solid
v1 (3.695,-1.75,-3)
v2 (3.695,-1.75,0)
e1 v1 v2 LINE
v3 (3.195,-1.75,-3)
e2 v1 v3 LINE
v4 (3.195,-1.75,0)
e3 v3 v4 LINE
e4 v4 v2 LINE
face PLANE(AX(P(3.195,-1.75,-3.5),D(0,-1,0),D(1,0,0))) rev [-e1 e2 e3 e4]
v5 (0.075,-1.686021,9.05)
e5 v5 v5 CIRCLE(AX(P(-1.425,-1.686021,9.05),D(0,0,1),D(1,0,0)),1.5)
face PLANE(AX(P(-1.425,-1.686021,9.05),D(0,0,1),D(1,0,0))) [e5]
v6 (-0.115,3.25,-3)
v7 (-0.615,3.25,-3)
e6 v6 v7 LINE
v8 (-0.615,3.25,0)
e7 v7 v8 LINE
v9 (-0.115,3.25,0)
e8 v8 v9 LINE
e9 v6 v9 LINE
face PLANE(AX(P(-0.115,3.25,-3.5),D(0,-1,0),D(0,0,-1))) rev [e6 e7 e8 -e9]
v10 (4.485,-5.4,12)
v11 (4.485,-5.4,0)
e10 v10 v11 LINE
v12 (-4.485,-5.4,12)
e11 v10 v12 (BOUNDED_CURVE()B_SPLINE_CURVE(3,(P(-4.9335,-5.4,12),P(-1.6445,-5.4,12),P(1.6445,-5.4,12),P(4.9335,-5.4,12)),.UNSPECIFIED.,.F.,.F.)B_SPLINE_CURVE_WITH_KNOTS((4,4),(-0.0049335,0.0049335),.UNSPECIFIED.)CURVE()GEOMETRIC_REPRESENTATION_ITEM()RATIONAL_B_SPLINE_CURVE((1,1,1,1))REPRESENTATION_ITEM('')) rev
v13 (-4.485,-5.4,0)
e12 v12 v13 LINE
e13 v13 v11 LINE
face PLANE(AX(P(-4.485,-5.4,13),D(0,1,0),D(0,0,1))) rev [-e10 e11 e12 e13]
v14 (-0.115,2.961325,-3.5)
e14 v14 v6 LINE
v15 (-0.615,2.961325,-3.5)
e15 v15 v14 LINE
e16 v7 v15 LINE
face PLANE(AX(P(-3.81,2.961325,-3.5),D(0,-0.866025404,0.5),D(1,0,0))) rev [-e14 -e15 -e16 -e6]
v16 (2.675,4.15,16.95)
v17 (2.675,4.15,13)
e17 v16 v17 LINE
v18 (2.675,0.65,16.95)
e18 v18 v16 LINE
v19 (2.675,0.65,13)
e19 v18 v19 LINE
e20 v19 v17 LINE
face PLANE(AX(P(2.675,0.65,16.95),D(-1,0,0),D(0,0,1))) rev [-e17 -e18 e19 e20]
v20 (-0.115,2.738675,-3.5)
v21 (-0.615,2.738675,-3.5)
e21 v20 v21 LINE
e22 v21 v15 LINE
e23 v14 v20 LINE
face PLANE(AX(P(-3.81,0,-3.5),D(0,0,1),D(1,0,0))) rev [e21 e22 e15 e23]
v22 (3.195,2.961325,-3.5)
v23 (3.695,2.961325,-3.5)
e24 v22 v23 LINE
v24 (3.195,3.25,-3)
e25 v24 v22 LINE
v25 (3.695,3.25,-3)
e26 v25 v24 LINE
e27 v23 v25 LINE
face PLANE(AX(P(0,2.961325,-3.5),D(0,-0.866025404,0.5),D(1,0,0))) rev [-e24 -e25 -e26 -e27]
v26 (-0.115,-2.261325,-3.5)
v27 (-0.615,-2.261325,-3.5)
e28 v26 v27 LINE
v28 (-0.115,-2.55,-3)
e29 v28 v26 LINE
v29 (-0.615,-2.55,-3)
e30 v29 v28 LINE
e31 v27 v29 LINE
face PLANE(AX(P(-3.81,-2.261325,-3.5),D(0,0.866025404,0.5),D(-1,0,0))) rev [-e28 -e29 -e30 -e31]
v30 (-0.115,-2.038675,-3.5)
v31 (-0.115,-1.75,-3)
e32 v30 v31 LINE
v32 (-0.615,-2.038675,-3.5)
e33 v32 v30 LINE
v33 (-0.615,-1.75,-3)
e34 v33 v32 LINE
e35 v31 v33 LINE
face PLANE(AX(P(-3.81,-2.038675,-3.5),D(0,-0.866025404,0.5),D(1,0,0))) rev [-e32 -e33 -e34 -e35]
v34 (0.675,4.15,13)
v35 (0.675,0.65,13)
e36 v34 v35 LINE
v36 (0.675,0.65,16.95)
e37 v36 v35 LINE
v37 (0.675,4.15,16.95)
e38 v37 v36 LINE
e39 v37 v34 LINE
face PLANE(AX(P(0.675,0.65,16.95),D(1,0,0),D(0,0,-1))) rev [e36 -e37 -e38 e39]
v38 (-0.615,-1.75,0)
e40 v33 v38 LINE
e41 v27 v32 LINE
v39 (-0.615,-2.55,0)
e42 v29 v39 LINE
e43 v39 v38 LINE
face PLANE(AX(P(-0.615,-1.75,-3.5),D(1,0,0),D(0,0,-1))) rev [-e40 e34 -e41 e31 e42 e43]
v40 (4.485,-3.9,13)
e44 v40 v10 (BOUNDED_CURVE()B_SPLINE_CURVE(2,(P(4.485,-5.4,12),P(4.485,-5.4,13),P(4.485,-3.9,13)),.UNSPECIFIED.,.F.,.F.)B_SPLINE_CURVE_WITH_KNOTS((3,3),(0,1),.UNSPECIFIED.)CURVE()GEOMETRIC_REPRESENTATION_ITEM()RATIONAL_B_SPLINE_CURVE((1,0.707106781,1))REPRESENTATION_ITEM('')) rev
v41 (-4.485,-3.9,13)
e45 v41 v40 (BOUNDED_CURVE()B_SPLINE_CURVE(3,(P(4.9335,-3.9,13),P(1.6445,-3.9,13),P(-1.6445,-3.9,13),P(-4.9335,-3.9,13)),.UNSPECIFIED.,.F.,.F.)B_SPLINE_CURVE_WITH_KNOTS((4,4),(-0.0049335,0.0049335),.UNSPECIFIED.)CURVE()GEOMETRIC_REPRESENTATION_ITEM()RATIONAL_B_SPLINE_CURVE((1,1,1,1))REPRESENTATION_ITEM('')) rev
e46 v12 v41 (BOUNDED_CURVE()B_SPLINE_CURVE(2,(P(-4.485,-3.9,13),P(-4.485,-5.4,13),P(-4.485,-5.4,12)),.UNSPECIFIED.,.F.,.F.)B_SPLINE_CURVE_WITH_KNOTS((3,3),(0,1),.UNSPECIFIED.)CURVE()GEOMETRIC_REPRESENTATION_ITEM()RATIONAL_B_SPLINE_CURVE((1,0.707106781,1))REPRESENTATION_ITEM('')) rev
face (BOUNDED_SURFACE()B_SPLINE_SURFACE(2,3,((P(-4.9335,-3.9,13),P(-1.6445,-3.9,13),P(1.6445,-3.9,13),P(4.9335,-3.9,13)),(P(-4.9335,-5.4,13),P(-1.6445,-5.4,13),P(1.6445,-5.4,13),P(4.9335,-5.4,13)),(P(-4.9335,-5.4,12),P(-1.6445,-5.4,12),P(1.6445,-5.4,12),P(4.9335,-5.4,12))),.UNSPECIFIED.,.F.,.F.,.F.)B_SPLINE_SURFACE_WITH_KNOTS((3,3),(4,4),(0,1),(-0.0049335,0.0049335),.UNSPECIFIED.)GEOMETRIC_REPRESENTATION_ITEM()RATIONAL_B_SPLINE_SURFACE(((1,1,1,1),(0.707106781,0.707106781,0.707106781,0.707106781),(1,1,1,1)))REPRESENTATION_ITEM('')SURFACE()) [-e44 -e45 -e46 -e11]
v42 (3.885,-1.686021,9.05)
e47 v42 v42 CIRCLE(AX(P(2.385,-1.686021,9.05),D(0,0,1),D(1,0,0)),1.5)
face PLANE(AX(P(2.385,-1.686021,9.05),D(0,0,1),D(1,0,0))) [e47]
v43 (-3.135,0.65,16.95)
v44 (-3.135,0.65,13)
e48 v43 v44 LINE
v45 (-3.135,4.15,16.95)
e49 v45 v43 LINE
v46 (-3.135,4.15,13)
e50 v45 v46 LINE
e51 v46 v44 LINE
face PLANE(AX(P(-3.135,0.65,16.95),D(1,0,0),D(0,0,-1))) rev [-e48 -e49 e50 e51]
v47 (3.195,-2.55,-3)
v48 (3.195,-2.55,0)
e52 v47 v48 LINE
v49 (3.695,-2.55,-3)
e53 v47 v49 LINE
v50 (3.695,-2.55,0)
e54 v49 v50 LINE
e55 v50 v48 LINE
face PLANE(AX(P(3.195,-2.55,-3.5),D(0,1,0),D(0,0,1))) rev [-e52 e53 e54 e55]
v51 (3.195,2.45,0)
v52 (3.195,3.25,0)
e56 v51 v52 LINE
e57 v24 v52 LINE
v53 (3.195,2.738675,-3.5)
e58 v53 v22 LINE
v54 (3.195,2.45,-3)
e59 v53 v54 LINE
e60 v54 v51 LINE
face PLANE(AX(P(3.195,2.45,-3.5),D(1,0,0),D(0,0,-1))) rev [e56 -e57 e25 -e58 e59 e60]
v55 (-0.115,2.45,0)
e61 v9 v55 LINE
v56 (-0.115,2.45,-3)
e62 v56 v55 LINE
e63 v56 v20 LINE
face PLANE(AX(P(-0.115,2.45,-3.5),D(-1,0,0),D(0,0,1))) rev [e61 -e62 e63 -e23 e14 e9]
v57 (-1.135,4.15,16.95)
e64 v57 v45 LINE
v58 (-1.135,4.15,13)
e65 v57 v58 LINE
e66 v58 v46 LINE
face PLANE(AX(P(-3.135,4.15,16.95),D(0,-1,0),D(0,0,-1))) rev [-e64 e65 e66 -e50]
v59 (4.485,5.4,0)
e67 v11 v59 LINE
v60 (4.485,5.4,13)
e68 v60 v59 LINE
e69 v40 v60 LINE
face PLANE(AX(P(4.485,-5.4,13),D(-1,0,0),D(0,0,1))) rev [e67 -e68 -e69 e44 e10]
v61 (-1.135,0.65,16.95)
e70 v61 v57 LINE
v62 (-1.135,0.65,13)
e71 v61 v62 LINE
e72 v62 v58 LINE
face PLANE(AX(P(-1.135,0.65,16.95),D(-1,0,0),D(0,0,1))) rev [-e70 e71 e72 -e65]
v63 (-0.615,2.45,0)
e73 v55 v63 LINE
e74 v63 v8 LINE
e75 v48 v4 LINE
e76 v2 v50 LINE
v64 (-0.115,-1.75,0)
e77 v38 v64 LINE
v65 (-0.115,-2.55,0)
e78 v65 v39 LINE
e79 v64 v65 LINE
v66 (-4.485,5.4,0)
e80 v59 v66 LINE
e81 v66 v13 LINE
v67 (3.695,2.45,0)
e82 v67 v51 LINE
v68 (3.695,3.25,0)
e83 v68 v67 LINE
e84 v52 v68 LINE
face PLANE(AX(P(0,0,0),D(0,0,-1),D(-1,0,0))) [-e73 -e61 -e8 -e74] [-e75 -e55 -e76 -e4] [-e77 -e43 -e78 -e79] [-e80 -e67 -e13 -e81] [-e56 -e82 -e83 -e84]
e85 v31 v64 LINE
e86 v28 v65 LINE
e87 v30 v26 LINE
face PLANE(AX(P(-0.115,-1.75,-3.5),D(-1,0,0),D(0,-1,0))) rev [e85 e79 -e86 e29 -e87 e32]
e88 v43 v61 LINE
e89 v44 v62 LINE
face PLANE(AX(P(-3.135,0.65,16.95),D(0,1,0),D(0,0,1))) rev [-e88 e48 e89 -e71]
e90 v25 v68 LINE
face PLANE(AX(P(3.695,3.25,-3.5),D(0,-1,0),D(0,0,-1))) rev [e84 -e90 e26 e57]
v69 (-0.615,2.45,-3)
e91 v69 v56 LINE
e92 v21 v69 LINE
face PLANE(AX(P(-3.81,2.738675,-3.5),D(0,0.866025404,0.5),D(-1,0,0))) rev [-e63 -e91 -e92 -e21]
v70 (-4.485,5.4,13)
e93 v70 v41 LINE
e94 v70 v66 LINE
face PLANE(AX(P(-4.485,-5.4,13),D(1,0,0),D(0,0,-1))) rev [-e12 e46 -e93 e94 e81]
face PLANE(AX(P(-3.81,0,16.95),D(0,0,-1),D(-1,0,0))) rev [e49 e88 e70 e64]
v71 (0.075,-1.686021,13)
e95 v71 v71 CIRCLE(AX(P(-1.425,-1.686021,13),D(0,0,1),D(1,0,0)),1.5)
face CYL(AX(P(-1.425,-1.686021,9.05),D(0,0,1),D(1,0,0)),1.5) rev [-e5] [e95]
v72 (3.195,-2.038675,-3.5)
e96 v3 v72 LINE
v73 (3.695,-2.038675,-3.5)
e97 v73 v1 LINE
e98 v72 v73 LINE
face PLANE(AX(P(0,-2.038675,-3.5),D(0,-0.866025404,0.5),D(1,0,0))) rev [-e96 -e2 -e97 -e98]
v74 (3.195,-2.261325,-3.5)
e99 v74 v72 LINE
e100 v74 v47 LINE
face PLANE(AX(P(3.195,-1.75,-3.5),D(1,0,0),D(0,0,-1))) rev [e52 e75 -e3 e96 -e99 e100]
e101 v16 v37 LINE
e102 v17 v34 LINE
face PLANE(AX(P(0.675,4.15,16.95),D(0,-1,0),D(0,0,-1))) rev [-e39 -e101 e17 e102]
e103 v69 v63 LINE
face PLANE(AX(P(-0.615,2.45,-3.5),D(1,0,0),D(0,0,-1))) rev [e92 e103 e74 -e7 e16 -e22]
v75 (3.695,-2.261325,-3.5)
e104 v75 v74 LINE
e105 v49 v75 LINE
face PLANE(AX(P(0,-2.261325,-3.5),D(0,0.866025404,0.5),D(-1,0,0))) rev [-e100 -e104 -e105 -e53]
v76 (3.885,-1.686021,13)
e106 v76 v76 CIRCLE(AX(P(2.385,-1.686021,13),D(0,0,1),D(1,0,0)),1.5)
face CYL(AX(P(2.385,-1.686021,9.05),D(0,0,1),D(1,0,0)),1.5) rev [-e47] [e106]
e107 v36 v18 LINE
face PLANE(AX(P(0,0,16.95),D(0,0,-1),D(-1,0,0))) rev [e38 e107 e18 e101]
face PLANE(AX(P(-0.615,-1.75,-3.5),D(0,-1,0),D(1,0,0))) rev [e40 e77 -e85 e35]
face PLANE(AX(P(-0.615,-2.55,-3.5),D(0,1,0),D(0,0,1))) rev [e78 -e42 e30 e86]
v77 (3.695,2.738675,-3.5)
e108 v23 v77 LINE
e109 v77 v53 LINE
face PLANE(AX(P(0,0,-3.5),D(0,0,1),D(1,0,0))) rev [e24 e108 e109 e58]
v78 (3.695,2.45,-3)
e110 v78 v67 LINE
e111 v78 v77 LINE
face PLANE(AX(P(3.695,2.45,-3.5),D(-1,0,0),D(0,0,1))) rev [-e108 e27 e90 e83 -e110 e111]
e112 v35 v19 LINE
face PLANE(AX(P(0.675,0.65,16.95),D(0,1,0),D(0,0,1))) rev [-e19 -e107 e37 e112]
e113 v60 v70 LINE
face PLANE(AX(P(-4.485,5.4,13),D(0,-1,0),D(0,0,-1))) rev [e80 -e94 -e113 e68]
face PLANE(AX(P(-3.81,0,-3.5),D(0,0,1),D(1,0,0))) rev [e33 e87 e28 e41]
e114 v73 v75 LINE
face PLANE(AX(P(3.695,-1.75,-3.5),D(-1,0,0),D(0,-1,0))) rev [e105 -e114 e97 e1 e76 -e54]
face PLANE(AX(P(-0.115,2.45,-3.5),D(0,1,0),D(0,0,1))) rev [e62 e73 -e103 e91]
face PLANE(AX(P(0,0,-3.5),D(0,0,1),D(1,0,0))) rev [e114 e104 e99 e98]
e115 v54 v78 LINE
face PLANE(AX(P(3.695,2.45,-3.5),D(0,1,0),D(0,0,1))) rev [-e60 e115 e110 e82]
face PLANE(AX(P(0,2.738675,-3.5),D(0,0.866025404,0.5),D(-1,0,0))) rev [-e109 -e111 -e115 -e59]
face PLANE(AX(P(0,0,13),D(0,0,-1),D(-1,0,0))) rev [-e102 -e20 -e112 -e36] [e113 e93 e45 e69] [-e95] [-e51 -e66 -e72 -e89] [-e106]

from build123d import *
from OCP.BRepFilletAPI import BRepFilletAPI_MakeChamfer

# Parameters (mm, degrees)
SKETCH_1_W                          = 8.97
SKETCH_1_H                          = 10.8
EXTRUDE_1_DEPTH                     = 13
FILLET_1_SIZE                       = 1
FILLET_1_SIZE_2                     = 1.5
SKETCH_2_W                          = 2
SKETCH_2_H                          = 3.5
EXTRUDE_2_DEPTH                     = 3.95
SKETCH_3_R                          = 1.5
CUT_EXTRUDE_1_DEPTH                 = 3.95
SKETCH_4_W                          = 0.5
SKETCH_4_H                          = 0.8
EXTRUDE_3_DEPTH                     = 3.5
CHAMFER_1_SIZE                      = 0.5
CHAMFER_1_SIZE2                     = 0.288675135
PATTERN_LINEAR_2_COUNT              = 2
PATTERN_LINEAR_2_PITCH              = 3.81
CHAMFER_1_OF_PATTERN_LINEAR_2_SIZE  = 0.5
CHAMFER_1_OF_PATTERN_LINEAR_2_SIZE2 = 0.288675135


with BuildPart() as part:
    # Эскиз1 → Бобышка-Вытянуть1 (new body)
    with BuildSketch(Plane.XY):
        Rectangle(SKETCH_1_W, SKETCH_1_H)
    extrude(amount=EXTRUDE_1_DEPTH)

    # Скругление1
    # an asymmetric fillet: 1.5, 1 mm, written as the material it takes off along each edge
    with BuildSketch(Plane(origin=(-8.235, -5.4, 13), x_dir=(0, 0, -1), z_dir=(1, 0, 0))) as fillet_1_piece_1:
        with BuildLine():
            Bezier((FILLET_1_SIZE, 0), (0, 0), (0, FILLET_1_SIZE_2), weights=[1, 0.707106781, 1])
            Line((0, FILLET_1_SIZE_2), (0, 0))
            Line((0, 0), (FILLET_1_SIZE, 0))
        make_face()
    extrude(amount=16.47, mode=Mode.SUBTRACT)

    # Эскиз2 → Бобышка-Вытянуть2 (add)
    with BuildSketch(Plane.XY.offset(13)):
        with Locations((1.675, 2.4)):
            Rectangle(SKETCH_2_W, SKETCH_2_H)
    extrude_2 = extrude(amount=EXTRUDE_2_DEPTH)

    # Эскиз3 → Вырез-Вытянуть1 (cut)
    with BuildSketch(Plane.XY.offset(13)):
        with Locations((2.385, -1.686021073)):
            Circle(SKETCH_3_R)
    cut_extrude_1 = extrude(amount=-CUT_EXTRUDE_1_DEPTH, mode=Mode.SUBTRACT)

    # Эскиз4 → Бобышка-Вытянуть3 (add)
    with BuildSketch(Plane(origin=(0, 0, 0), x_dir=(-1, 0, 0), z_dir=(0, 0, -1))):
        with Locations((-3.445, 2.85)):
            Rectangle(SKETCH_4_W, SKETCH_4_H)
        with Locations((-3.445, -2.15)):
            Rectangle(SKETCH_4_W, SKETCH_4_H)
    extrude_3 = extrude(amount=EXTRUDE_3_DEPTH)

    # Фаска1: one chamfer whose edges measure the first distance from different faces: ONE call of the kernel's chamfer builder (chamfer() names one face for all edges)
    chamfer_1_edges_1 = [part.edges().sort_by_distance(p)[0] for p in [
        (3.445, 3.25, -3.5),
    ]]
    chamfer_1_side_1 = [part.faces().sort_by_distance(p)[0] for p in [
        (3.445, 3.25, -1.75),
    ]]
    chamfer_1_edges_2 = [part.edges().sort_by_distance(p)[0] for p in [
        (3.445, 2.45, -3.5),
    ]]
    chamfer_1_side_2 = [part.faces().sort_by_distance(p)[0] for p in [
        (3.445, 2.45, -1.75),
    ]]
    chamfer_1_edges_3 = [part.edges().sort_by_distance(p)[0] for p in [
        (3.445, -2.55, -3.5),
    ]]
    chamfer_1_side_3 = [part.faces().sort_by_distance(p)[0] for p in [
        (3.445, -2.55, -1.75),
    ]]
    chamfer_1_edges_4 = [part.edges().sort_by_distance(p)[0] for p in [
        (3.445, -1.75, -3.5),
    ]]
    chamfer_1_side_4 = [part.faces().sort_by_distance(p)[0] for p in [
        (3.445, -1.75, -1.75),
    ]]
    chamfer_1 = BRepFilletAPI_MakeChamfer(part.part.solid().wrapped)
    for e in chamfer_1_edges_1:
        chamfer_1.Add(CHAMFER_1_SIZE, CHAMFER_1_SIZE2, e.wrapped, chamfer_1_side_1[0].wrapped)  # the first distance lies on this face
    for e in chamfer_1_edges_2:
        chamfer_1.Add(CHAMFER_1_SIZE, CHAMFER_1_SIZE2, e.wrapped, chamfer_1_side_2[0].wrapped)  # the first distance lies on this face
    for e in chamfer_1_edges_3:
        chamfer_1.Add(CHAMFER_1_SIZE, CHAMFER_1_SIZE2, e.wrapped, chamfer_1_side_3[0].wrapped)  # the first distance lies on this face
    for e in chamfer_1_edges_4:
        chamfer_1.Add(CHAMFER_1_SIZE, CHAMFER_1_SIZE2, e.wrapped, chamfer_1_side_4[0].wrapped)  # the first distance lies on this face
    add(Compound.cast(chamfer_1.Shape()), mode=Mode.REPLACE)

    # Линейный массив2: Бобышка-Вытянуть2, Вырез-Вытянуть1, Бобышка-Вытянуть3 ×2
    with Locations(*[(-i * PATTERN_LINEAR_2_PITCH, 0, 0) for i in range(1, PATTERN_LINEAR_2_COUNT)]):
        add(extrude_2)
        add(cut_extrude_1, mode=Mode.SUBTRACT)
        add(extrude_3)

    # Фаска1 of Линейный массив2: one chamfer whose edges measure the first distance from different faces: ONE call of the kernel's chamfer builder (chamfer() names one face for all edges)
    chamfer_1_of_pattern_linear_2_edges_1 = [part.edges().sort_by_distance(p)[0] for p in [
        (-0.365, 3.25, -3.5),
    ]]
    chamfer_1_of_pattern_linear_2_side_1 = [part.faces().sort_by_distance(p)[0] for p in [
        (-0.365, 3.25, -1.75),
    ]]
    chamfer_1_of_pattern_linear_2_edges_2 = [part.edges().sort_by_distance(p)[0] for p in [
        (-0.365, 2.45, -3.5),
    ]]
    chamfer_1_of_pattern_linear_2_side_2 = [part.faces().sort_by_distance(p)[0] for p in [
        (-0.365, 2.45, -1.75),
    ]]
    chamfer_1_of_pattern_linear_2_edges_3 = [part.edges().sort_by_distance(p)[0] for p in [
        (-0.365, -2.55, -3.5),
    ]]
    chamfer_1_of_pattern_linear_2_side_3 = [part.faces().sort_by_distance(p)[0] for p in [
        (-0.365, -2.55, -1.75),
    ]]
    chamfer_1_of_pattern_linear_2_edges_4 = [part.edges().sort_by_distance(p)[0] for p in [
        (-0.365, -1.75, -3.5),
    ]]
    chamfer_1_of_pattern_linear_2_side_4 = [part.faces().sort_by_distance(p)[0] for p in [
        (-0.365, -1.75, -1.75),
    ]]
    chamfer_1_of_pattern_linear_2 = BRepFilletAPI_MakeChamfer(part.part.solid().wrapped)
    for e in chamfer_1_of_pattern_linear_2_edges_1:
        chamfer_1_of_pattern_linear_2.Add(CHAMFER_1_OF_PATTERN_LINEAR_2_SIZE, CHAMFER_1_OF_PATTERN_LINEAR_2_SIZE2, e.wrapped, chamfer_1_of_pattern_linear_2_side_1[0].wrapped)  # the first distance lies on this face
    for e in chamfer_1_of_pattern_linear_2_edges_2:
        chamfer_1_of_pattern_linear_2.Add(CHAMFER_1_OF_PATTERN_LINEAR_2_SIZE, CHAMFER_1_OF_PATTERN_LINEAR_2_SIZE2, e.wrapped, chamfer_1_of_pattern_linear_2_side_2[0].wrapped)  # the first distance lies on this face
    for e in chamfer_1_of_pattern_linear_2_edges_3:
        chamfer_1_of_pattern_linear_2.Add(CHAMFER_1_OF_PATTERN_LINEAR_2_SIZE, CHAMFER_1_OF_PATTERN_LINEAR_2_SIZE2, e.wrapped, chamfer_1_of_pattern_linear_2_side_3[0].wrapped)  # the first distance lies on this face
    for e in chamfer_1_of_pattern_linear_2_edges_4:
        chamfer_1_of_pattern_linear_2.Add(CHAMFER_1_OF_PATTERN_LINEAR_2_SIZE, CHAMFER_1_OF_PATTERN_LINEAR_2_SIZE2, e.wrapped, chamfer_1_of_pattern_linear_2_side_4[0].wrapped)  # the first distance lies on this face
    add(Compound.cast(chamfer_1_of_pattern_linear_2.Shape()), mode=Mode.REPLACE)


solid = part.part
